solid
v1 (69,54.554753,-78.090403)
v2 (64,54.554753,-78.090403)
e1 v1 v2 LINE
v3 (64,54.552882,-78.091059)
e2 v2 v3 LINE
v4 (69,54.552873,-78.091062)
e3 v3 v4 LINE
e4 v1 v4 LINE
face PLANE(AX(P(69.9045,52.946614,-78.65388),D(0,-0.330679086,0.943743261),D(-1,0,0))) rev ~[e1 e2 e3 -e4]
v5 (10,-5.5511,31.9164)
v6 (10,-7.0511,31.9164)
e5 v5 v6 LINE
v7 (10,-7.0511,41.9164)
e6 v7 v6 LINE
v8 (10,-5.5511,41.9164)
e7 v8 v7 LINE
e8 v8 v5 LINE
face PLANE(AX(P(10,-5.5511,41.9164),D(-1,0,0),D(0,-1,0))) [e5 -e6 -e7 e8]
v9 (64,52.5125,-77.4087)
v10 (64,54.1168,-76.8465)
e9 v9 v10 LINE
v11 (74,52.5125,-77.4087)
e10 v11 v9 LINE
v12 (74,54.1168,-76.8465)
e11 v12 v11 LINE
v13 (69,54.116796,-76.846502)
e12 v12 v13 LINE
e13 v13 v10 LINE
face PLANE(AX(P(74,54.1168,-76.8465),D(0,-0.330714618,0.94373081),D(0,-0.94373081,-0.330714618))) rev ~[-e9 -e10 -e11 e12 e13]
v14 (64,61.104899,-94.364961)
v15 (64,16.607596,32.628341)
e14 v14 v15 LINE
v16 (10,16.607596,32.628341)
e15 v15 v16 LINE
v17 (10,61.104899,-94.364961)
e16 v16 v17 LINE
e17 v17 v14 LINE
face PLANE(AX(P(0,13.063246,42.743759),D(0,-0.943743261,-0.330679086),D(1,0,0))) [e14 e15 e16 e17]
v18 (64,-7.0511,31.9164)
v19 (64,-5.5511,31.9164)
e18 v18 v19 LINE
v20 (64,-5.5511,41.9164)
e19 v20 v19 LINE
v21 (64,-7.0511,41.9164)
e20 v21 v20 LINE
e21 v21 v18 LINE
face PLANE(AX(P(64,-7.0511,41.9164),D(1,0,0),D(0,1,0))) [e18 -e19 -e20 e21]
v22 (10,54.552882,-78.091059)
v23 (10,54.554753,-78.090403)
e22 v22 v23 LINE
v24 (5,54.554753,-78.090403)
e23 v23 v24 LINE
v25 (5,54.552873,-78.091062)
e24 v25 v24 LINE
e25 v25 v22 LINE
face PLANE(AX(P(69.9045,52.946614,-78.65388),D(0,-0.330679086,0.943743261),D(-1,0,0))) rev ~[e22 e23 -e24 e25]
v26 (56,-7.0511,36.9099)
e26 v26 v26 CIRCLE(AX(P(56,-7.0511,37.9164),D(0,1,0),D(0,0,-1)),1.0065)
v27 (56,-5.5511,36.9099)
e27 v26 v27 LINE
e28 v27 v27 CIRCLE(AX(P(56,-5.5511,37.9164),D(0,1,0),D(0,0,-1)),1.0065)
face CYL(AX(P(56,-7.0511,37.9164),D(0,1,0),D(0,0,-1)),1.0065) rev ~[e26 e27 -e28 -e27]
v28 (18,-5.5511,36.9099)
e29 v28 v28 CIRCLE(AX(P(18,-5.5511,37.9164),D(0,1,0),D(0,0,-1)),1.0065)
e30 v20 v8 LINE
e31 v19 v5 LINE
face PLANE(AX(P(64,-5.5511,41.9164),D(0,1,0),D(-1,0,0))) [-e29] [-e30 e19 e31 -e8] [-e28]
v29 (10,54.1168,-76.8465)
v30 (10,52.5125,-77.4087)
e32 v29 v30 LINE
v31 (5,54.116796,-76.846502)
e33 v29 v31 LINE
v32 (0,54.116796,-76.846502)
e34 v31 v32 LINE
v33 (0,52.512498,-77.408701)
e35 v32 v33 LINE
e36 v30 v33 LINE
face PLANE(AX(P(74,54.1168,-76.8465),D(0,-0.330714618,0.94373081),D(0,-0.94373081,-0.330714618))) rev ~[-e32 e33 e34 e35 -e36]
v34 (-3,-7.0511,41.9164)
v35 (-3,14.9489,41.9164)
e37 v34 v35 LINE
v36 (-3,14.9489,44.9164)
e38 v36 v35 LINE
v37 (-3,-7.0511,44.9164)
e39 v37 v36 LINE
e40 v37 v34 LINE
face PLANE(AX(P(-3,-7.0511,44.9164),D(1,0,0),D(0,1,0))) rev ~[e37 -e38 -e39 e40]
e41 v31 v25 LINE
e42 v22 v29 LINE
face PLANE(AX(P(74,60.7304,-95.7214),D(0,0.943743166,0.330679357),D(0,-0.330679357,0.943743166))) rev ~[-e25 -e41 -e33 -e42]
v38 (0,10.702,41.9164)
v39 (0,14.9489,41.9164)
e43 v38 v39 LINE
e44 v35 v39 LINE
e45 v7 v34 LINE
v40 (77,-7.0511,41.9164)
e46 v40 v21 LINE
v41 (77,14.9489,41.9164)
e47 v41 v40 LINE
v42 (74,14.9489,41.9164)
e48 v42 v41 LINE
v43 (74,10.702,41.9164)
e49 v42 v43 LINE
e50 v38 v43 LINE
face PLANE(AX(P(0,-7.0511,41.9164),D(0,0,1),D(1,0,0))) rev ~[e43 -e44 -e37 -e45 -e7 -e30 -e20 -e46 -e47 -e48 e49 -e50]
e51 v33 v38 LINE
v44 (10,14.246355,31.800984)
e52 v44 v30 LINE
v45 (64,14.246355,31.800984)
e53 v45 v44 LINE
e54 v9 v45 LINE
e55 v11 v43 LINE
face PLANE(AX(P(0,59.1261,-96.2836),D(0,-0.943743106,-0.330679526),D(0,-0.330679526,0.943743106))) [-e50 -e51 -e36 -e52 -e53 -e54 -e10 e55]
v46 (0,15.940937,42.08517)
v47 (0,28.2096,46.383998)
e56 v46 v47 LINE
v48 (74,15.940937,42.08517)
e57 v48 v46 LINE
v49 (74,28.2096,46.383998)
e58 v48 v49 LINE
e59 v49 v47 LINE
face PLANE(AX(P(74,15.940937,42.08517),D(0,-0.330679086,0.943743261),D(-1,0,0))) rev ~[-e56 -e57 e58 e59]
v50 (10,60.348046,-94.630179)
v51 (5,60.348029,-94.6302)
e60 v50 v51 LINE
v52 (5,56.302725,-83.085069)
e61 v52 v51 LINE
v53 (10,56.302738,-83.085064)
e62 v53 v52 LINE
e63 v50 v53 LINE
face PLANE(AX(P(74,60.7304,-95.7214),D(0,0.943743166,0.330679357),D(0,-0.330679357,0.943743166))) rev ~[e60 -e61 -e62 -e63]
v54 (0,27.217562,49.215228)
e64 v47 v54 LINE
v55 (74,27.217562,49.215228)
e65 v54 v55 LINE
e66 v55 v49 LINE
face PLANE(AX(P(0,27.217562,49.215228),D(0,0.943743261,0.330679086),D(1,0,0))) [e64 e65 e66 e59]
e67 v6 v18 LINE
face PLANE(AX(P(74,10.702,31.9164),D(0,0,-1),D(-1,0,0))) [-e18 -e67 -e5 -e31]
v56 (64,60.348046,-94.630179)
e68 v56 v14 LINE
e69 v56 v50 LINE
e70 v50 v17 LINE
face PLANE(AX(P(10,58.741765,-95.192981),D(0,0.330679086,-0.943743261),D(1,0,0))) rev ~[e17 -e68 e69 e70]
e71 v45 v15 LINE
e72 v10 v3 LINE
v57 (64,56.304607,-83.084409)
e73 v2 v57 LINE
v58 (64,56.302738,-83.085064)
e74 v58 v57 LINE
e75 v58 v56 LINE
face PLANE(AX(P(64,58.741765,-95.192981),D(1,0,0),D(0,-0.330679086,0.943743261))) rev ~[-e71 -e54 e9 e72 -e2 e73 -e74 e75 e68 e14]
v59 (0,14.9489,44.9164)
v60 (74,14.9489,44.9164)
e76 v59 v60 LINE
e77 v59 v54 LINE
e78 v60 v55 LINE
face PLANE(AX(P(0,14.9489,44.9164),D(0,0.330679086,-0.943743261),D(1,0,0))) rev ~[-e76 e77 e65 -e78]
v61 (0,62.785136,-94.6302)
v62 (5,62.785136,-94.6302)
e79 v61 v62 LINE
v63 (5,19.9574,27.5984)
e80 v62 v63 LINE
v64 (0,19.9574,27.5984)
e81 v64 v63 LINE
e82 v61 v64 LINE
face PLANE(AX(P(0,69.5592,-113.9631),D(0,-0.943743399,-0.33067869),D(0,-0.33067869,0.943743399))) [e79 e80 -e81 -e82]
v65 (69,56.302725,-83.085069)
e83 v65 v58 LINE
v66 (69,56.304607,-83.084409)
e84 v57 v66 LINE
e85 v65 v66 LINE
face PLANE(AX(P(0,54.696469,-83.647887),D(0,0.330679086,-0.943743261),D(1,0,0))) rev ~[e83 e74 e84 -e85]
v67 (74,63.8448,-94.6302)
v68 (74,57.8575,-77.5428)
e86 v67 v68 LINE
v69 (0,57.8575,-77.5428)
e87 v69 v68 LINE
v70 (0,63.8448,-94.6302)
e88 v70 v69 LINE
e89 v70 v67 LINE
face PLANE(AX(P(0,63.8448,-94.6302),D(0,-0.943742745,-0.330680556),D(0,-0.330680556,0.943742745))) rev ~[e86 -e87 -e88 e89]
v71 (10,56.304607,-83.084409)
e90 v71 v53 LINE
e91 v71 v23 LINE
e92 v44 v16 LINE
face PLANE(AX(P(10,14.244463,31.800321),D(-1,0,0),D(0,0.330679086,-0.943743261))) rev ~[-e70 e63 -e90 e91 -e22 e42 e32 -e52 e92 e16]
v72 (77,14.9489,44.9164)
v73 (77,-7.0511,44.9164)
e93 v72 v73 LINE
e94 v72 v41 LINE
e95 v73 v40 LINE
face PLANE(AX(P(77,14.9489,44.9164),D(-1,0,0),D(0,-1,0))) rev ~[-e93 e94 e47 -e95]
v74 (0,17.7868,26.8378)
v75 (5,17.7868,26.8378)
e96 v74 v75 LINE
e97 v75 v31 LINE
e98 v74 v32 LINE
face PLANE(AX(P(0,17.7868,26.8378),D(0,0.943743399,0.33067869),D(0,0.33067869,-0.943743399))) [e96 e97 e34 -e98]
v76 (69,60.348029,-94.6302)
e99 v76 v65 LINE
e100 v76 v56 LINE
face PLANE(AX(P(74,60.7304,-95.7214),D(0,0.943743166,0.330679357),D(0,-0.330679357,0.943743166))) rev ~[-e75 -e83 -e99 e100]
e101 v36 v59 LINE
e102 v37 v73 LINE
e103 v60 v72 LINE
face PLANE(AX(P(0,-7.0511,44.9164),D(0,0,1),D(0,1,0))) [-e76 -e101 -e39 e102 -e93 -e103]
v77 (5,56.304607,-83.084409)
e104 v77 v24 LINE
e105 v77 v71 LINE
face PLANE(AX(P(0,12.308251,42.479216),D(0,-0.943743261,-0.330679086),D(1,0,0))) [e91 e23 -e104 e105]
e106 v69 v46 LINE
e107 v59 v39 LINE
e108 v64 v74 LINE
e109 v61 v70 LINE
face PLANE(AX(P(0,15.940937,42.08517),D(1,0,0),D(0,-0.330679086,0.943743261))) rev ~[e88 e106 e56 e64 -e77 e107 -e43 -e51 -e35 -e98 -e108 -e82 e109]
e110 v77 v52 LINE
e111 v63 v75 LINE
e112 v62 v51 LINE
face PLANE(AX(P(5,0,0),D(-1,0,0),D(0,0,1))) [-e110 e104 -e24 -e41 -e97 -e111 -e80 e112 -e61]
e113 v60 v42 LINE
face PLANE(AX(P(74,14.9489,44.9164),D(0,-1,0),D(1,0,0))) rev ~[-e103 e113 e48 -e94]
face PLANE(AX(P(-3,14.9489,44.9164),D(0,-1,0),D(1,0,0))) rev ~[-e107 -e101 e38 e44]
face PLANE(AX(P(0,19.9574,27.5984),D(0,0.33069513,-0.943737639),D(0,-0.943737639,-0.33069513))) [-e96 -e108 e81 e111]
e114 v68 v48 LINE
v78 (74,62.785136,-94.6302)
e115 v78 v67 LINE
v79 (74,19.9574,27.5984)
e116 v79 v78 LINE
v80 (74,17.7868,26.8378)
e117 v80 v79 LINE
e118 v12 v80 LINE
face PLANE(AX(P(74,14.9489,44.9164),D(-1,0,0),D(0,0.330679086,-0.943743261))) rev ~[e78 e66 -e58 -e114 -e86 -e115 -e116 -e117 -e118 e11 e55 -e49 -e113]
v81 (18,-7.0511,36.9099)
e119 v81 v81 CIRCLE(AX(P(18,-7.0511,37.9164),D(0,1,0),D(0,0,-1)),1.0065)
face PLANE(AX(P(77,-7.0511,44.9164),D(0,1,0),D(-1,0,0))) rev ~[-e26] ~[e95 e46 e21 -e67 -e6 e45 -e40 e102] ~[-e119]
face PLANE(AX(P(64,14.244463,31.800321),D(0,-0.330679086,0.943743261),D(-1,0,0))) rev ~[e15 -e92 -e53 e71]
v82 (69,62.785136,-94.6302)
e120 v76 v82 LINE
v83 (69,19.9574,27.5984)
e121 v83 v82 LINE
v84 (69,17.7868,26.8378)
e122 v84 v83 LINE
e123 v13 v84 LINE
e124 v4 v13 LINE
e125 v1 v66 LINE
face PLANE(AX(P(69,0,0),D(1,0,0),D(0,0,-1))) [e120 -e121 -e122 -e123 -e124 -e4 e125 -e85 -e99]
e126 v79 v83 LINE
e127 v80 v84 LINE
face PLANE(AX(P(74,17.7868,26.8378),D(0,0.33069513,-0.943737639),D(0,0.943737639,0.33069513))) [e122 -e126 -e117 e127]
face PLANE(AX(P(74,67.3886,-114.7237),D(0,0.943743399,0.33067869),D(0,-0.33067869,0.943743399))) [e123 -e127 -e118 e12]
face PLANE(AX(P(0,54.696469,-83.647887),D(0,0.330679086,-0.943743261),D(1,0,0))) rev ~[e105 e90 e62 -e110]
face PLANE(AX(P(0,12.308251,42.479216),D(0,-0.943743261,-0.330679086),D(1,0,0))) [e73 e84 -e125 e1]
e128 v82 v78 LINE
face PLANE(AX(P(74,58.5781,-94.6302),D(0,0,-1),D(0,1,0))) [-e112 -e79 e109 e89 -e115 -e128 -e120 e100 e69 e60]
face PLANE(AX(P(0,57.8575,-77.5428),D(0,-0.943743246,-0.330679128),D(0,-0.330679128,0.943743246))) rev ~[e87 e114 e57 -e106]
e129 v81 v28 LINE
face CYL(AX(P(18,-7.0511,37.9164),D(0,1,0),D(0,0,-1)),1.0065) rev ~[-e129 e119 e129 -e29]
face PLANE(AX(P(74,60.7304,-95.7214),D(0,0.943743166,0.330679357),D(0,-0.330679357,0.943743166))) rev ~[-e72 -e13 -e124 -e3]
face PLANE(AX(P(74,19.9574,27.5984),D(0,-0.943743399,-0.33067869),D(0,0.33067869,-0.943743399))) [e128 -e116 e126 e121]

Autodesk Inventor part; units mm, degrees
ref_plane "YZ Plane" through (0, 0, 0) normal (1, 0, 0) x (0, 1, 0)
ref_plane "XZ Plane" through (0, 0, 0) normal (0, 1, 0) x (-1, 0, 0)
ref_plane "XY Plane" through (0, 0, 0) normal (0, 0, 1) x (1, 0, 0)
sketch "草图1" plane through (0, 0, 0) normal (1, 0, 0) x (0, 1, 0)
  line L0 (-7.0511, 44.9164) -> (14.9489, 44.9164)
  line L1 (59.1261, -96.2836) -> (10.702, 41.9164)
  line L2 (10.702, 41.9164) -> (-7.0511, 41.9164)
  line L3 (-7.0511, 41.9164) -> (-7.0511, 44.9164)
  line L4 (57.8575, -77.5428) -> (14.9489, 44.9164)
  line L5 (63.8448, -94.6302) -> (59.1261, -96.2836)
  line L6 (63.8448, -94.6302) -> (57.8575, -77.5428)
  line L7 (10.702, 41.9164) -> (10.702, 44.9164)
  line L8 (14.9489, 44.9164) -> (14.9489, 41.9164)
  point P0 (0, 0)
  dimension "d1" = 3
  dimension "d2" = 109.31
  dimension "d3" = 138.2
  dimension "d10" = 5
  dimension "d90" = 22
extrude "拉伸1" add sketch "草图1" along normal blind 74
sketch "草图4" plane through (0, 14.9489, 44.9164) normal (0, 0.9437433, 0.3306791) x (1, 0, 0)
  line L0 (74, 3) -> (0, 3)
  line L1 (0, 3) -> (0, 0)
  line L2 (0, 0) -> (74, 0)
  line L3 (74, 0) -> (74, 3)
  line L4 (0, 0) -> (74, 0) projected
  line L5 (74, 147.865) -> (74, 0) projected
  line L6 (0, 0) -> (0, 147.865) projected
  point P0 (0, 37.4463)
  point P1 (67.5, 129.877)
  point P2 (0, 129.877)
  dimension "d11" = 3
extrude "拉伸3" add sketch "草图4" along normal blind 13
sketch "草图5" plane through (74, 0, 0) normal (1, 0, 0) x (0, 0, -1)
  line L0 (-27.5984, 19.9574) -> (113.9631, 69.5592)
  line L1 (113.9631, 69.5592) -> (114.7237, 67.3886)
  line L2 (114.7237, 67.3886) -> (-26.8378, 17.7868)
  line L3 (-26.8378, 17.7868) -> (-27.5984, 19.9574)
  line L4 (94.6302, 63.8448) -> (-42.0852, 15.9409) projected
  line L5 (-42.0852, 15.9409) -> (-40.3206, 10.9047)
  point P0 (0, 0)
  point P1 (78.0607, 56.3152)
  dimension "d15" = 1
  dimension "d16" = 150
  dimension "d17" = 2.3
  dimension "d22" = 15
extrude "拉伸4" cut sketch "草图5" against normal blind 5
sketch "草图6" plane through (0, 0, 0) normal (-1, 0, 0) x (0, 0, 1)
  line L0 (-113.9631, 69.5592) -> (27.5984, 19.9574)
  line L1 (27.5984, 19.9574) -> (26.8378, 17.7868)
  line L2 (26.8378, 17.7868) -> (-114.7237, 67.3886)
  line L3 (-114.7237, 67.3886) -> (-113.9631, 69.5592)
  line L4 (42.0852, 15.9409) -> (-94.6302, 63.8448) projected
  line L5 (42.0852, 15.9409) -> (38.373, 5.3464)
  point P0 (0, 0)
  point P1 (-78.0607, 56.3152)
  dimension "d20" = 1
  dimension "d21" = 2.3
  dimension "d23" = 15
  dimension "d24" = 150
extrude "拉伸5" cut sketch "草图6" against normal blind 5
sketch "草图8" plane through (74, 0, 0) normal (1, 0, 0) x (0, 0, -1)
  line L0 (96.2836, 59.1261) -> (95.7214, 60.7304)
  line L1 (95.7214, 60.7304) -> (76.8465, 54.1168)
  line L2 (76.8465, 54.1168) -> (77.4087, 52.5125)
  line L3 (77.4087, 52.5125) -> (96.2836, 59.1261)
  line L4 (96.2836, 59.1261) -> (95.7214, 60.7304) projected
  line L5 (-41.9164, 10.702) -> (96.2836, 59.1261) projected
  line L6 (95.7214, 60.7304) -> (-26.8378, 17.7868) projected
  point P0 (0, 0)
  point P1 (84.6027, 53.1652)
  dimension "d32" = 20
extrude "拉伸7" cut sketch "草图8" against normal blind 100
sketch "草图9" plane through (0, -7.0511, 44.9164) normal (0, 0, 1) x (1, 0, 0)
  line L0 (-3, 22) -> (77, 22)
  line L1 (77, 22) -> (77, 0)
  line L2 (77, 0) -> (-3, 0)
  line L3 (-3, 0) -> (-3, 22)
  line L4 (0, 22) -> (74, 22) projected
  line L5 (0, 0) -> (74, 0) projected
  line L6 (0, 0) -> (0, 22) projected
  line L7 (74, 22) -> (74, 0) projected
  point P0 (0, 7.0511)
  dimension "d35" = 3
  dimension "d36" = 3
extrude "拉伸8" add sketch "草图9" against normal blind 3 contours L0 L6 L2 L3 | L0 L1 L2 L7
sketch "草图10" plane through (74, 10.702, 41.9164) normal (0, 0, -1) x (-1, 0, 0)
  line L0 (10, -16.2531) -> (64, -16.2531)
  line L1 (64, -16.2531) -> (64, -17.7531)
  line L2 (64, -17.7531) -> (10, -17.7531)
  line L3 (10, -17.7531) -> (10, -16.2531)
  line L4 (-3, -17.7531) -> (77, -17.7531) projected
  line L5 (0, 0) -> (0, 41.8104) projected
  line L6 (77, -17.7531) -> (77, 4.2469) projected
  line L7 (74, 41.8104) -> (74, 0) projected
  point P0 (74, -10.702)
  point P1 (0, 38.8623)
  point P2 (67.5, 38.8623)
  point P3 (80, 48.424)
  dimension "d39" = 1.5
  dimension "d40" = 10
  dimension "d55" = 10
extrude "拉伸9" add sketch "草图10" along normal blind 10
sketch "草图11" plane through (-3, -7.0511, 44.9164) normal (0, -1, 0) x (1, 0, 0)
  line L0 (77, -3) -> (77, -122.3251) projected
  line L1 (3, -122.3251) -> (3, -3) projected
  line L2 (0, 0) -> (80, 0) projected
  line L3 (80, -3) -> (67, -3) projected
  line L4 (13, -3) -> (13, -13) projected
  line L5 (67, -13) -> (13, -13) projected
  point P0 (3, -44.9164)
  point P1 (59, -7)
  point P2 (21, -7)
  point P3 (70.75, -123.9692)
  point P4 (3.25, -123.9692)
  point P5 (3.25, -141.2)
  dimension "d44" = 18
  dimension "d45" = 18
  dimension "d53" = 7
  dimension "d54" = 7
  dimension "d56" = 3
  dimension "d57" = 8
  dimension "d58" = 6
hole "孔1" at (56, -7.0511, 37.9164) at (18, -7.0511, 37.9164) direction (0, 1, 0) diameter 2.013 depth 2 tip angle 118 thread size "M2.5x0.45" class "6H" standard "ANSI Metric M Profile"
sketch "草图21" plane through (74, 0, 0) normal (1, 0, 0) x (0, 0, -1)
  line L0 (-42.0852, 15.9409) -> (94.6302, 63.8448) projected
  line L1 (94.6302, 63.8448) -> (95.8266, 63.8448)
  line L2 (95.8266, 63.8448) -> (95.8266, 58.5781)
  line L3 (95.8266, 58.5781) -> (94.6302, 58.5781)
  line L4 (94.6302, 58.5781) -> (94.6302, 63.8448)
  point P0 (0, 0)
extrude "拉伸14" cut sketch "草图21" against normal blind 150
sketch "草图22" plane through (0, 10.702, 41.9164) normal (0, -0.9437433, -0.3306791) x (1, 0, 0)
  line L0 (5, -145.2818) -> (69, -145.2818) projected
  line L1 (64, -10.7184) -> (10, -10.7184)
  line L2 (10, -10.7184) -> (10, -145.2818)
  line L3 (10, -145.2818) -> (64, -145.2818)
  line L4 (64, -145.2818) -> (64, -10.7184)
  line L5 (74, 0) -> (74, -126.4381) projected
  line L6 (0, -126.4381) -> (0, 0) projected
  line L7 (74, -16.5731) -> (74, -146.0877) projected
  line L8 (69, -145.2818) -> (69, -146.0877) projected
  point P0 (0, -36.0194)
  point P1 (67.5, -127.0584)
  point P2 (0, -127.0584)
  point P3 (74, -146.0877)
  point P4 (64, -145.2818)
  point P5 (80, -133.0485)
  point P6 (0, -133.0485)
  point P7 (12, -145.2818)
  point P8 (0, -146.4381)
  point P9 (64, -145.2818)
  dimension "d74" = 10
  dimension "d75" = 10
  dimension "d76" = 5
extrude "拉伸15" cut sketch "草图22" against normal blind 2.5
sketch "草图25" plane through (0, 10.702, 41.9164) normal (0, -0.9437433, -0.3306791) x (1, 0, 0)
  line L0 (0, -126.4381) -> (0, 0) projected
  line L1 (69.9045, -127.7568) -> (0, -127.7568)
  line L2 (0, -127.7568) -> (0, -133.0485)
  line L3 (0, -133.0485) -> (69.9045, -133.0485)
  line L4 (69.9045, -133.0485) -> (69.9045, -127.7568)
  point P0 (0, -36.0194)
  point P1 (0, -127.7568)
extrude "拉伸16" cut sketch "草图25" against normal blind 1.7
properties part number "cover"
